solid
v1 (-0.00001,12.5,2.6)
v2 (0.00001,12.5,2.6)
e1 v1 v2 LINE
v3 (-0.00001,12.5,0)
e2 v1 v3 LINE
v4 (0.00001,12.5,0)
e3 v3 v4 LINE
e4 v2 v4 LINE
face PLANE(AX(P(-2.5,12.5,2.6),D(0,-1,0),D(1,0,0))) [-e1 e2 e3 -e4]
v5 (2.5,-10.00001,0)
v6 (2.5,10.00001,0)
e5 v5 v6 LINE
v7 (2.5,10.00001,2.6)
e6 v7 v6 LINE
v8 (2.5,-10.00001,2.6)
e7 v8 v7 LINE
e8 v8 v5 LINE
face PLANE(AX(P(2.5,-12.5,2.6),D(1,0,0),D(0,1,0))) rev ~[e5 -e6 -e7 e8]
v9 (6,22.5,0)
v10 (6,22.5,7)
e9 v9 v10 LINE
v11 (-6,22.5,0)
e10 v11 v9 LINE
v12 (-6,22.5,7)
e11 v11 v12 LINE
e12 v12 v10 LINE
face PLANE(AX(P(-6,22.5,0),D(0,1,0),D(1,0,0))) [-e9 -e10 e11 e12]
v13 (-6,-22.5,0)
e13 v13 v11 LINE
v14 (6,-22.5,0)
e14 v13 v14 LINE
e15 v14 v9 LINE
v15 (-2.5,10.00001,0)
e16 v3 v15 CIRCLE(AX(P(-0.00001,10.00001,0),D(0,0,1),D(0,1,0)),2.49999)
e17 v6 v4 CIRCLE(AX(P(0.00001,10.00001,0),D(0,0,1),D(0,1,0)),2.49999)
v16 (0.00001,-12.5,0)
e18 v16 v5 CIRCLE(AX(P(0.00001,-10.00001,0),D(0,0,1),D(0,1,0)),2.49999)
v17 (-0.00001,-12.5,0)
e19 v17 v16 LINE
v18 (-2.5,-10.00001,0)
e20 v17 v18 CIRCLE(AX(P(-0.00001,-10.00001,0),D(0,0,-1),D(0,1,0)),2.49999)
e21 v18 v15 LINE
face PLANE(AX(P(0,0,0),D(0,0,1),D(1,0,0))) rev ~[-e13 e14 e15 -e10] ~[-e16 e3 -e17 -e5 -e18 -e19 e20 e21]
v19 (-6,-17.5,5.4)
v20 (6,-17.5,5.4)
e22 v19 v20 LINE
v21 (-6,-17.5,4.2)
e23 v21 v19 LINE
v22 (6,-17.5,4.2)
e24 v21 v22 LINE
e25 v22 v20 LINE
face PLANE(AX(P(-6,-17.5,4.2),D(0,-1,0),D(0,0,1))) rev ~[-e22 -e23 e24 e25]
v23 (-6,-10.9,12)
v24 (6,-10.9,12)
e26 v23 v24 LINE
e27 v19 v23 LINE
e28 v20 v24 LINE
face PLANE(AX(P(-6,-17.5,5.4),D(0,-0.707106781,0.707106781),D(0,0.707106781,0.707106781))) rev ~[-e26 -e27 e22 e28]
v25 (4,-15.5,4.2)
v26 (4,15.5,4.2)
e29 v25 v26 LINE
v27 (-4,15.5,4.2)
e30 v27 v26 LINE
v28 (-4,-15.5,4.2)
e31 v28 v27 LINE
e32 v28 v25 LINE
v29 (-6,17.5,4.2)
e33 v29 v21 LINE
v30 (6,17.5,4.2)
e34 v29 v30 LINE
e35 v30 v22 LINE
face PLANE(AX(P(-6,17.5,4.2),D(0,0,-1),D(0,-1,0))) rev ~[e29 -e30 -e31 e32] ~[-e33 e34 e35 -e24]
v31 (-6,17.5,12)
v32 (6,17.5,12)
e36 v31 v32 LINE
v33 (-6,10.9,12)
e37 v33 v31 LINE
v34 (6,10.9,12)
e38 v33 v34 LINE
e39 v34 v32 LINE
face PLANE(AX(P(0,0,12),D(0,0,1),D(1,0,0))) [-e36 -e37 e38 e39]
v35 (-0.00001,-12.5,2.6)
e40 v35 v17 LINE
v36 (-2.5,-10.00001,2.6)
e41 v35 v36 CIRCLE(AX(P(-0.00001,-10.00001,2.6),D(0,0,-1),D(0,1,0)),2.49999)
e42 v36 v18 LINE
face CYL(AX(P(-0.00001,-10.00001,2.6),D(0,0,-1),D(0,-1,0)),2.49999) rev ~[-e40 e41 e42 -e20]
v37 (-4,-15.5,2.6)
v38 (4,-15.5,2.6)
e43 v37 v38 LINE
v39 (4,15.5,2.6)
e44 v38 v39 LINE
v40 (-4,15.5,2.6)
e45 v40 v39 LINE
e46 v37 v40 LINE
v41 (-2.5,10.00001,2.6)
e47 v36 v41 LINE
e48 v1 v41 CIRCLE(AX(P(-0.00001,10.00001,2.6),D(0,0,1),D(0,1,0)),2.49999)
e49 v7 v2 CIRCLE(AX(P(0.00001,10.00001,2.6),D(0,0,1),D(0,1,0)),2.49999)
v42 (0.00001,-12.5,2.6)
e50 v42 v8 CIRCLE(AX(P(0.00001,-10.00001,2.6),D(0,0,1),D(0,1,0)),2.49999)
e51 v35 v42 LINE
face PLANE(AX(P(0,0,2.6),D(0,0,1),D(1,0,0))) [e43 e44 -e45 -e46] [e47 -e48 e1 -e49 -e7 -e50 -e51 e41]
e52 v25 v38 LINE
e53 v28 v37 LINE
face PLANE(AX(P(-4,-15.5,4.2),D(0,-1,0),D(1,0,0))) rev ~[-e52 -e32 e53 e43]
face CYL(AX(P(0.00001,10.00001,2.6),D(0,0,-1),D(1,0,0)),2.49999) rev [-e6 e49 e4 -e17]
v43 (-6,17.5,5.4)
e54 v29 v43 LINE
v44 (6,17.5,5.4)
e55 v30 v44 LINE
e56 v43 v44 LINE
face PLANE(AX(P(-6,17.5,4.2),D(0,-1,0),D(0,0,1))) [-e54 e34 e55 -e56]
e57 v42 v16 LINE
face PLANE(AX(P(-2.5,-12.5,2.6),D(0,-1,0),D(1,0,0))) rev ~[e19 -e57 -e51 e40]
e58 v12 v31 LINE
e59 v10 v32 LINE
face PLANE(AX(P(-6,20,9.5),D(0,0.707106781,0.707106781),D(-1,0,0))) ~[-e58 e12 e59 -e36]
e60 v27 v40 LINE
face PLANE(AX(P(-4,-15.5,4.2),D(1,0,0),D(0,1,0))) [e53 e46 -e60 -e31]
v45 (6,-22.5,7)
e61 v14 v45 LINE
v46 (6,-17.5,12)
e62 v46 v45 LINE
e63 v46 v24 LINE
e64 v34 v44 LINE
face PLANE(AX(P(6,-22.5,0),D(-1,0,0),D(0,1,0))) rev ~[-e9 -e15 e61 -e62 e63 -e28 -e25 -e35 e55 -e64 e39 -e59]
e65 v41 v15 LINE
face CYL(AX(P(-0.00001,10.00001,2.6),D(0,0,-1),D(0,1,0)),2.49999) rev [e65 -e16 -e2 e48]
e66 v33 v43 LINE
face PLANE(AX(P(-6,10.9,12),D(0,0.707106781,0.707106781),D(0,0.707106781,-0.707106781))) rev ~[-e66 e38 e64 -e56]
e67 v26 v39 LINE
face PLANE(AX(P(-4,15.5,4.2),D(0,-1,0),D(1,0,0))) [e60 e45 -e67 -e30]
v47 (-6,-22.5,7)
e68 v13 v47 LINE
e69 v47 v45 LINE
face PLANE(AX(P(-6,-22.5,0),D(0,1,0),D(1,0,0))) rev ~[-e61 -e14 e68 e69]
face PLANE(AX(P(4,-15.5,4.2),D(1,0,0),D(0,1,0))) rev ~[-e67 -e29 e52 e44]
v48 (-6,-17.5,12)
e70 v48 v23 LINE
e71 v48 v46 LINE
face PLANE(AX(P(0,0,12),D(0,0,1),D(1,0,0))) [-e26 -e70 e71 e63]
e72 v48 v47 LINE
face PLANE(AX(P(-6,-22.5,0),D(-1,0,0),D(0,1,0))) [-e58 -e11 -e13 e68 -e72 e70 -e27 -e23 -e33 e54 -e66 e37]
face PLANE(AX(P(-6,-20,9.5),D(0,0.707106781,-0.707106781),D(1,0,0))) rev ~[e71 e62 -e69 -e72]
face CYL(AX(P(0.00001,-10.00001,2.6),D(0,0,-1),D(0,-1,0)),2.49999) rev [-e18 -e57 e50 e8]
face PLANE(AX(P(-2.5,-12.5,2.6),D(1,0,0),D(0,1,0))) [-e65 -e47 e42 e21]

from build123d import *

# Parameters (mm, degrees)
F0_W     = 12
F0_H     = 45
F1_DEPTH = 12
F2_W     = 35
F2_H     = 1.2
F3_DEPTH = 12
F4_SIZE  = 5
F5_W     = 8
F5_H     = 31
F6_DEPTH = 1.6
F7_W     = 5
F7_H     = 25
F8_DEPTH = 2.6
F9_R     = 2.49999


# Not quite as in the source:
# - a fillet or chamfer is up to 0.001 mm smaller than in the source, because OpenCascade refuses the exact size


with BuildPart() as f1:
    # F0 (on Top) → F1 (new body)
    with BuildSketch(Plane.XY):
        Rectangle(F0_W, F0_H)
    extrude(amount=F1_DEPTH)

    # F2 (on face) → F3 (cut, through all)
    with BuildSketch(Plane(origin=(-6, 0, 0), x_dir=(0, -1, 0), z_dir=(-1, 0, 0))):
        Polygon((-17.5, 5.4), (17.5, 5.4), (10.9, 12), (-10.9, 12), align=None)
        with Locations((0, 4.8)):
            Rectangle(F2_W, F2_H)
    extrude(amount=-F3_DEPTH, mode=Mode.SUBTRACT)

    # F4
    f4_edges = [f1.edges().sort_by_distance(p)[0] for p in [
        (0, 22.5, 12),
        (0, -22.5, 12),
    ]]
    chamfer(f4_edges, length=F4_SIZE)

    # F5 (on face) → F6 (cut)
    with BuildSketch(Plane.XY.offset(4.2)):
        Rectangle(F5_W, F5_H)
    extrude(amount=-F6_DEPTH, mode=Mode.SUBTRACT)

    # F7 (on face) → F8 (cut, through all)
    with BuildSketch(Plane.XY.offset(2.6)):
        Rectangle(F7_W, F7_H)
    extrude(amount=-F8_DEPTH, mode=Mode.SUBTRACT)

    # F9 (radius 2.5 in the source; OpenCascade refuses exactly that, so slightly less here)
    f9_edges = [f1.edges().sort_by_distance(p)[0] for p in [
        (2.5, 12.5, 1.3),
        (-2.5, 12.5, 1.3),
        (-2.5, -12.5, 1.3),
        (2.5, -12.5, 1.3),
    ]]
    fillet(f9_edges, radius=F9_R)


solid = f1.part
